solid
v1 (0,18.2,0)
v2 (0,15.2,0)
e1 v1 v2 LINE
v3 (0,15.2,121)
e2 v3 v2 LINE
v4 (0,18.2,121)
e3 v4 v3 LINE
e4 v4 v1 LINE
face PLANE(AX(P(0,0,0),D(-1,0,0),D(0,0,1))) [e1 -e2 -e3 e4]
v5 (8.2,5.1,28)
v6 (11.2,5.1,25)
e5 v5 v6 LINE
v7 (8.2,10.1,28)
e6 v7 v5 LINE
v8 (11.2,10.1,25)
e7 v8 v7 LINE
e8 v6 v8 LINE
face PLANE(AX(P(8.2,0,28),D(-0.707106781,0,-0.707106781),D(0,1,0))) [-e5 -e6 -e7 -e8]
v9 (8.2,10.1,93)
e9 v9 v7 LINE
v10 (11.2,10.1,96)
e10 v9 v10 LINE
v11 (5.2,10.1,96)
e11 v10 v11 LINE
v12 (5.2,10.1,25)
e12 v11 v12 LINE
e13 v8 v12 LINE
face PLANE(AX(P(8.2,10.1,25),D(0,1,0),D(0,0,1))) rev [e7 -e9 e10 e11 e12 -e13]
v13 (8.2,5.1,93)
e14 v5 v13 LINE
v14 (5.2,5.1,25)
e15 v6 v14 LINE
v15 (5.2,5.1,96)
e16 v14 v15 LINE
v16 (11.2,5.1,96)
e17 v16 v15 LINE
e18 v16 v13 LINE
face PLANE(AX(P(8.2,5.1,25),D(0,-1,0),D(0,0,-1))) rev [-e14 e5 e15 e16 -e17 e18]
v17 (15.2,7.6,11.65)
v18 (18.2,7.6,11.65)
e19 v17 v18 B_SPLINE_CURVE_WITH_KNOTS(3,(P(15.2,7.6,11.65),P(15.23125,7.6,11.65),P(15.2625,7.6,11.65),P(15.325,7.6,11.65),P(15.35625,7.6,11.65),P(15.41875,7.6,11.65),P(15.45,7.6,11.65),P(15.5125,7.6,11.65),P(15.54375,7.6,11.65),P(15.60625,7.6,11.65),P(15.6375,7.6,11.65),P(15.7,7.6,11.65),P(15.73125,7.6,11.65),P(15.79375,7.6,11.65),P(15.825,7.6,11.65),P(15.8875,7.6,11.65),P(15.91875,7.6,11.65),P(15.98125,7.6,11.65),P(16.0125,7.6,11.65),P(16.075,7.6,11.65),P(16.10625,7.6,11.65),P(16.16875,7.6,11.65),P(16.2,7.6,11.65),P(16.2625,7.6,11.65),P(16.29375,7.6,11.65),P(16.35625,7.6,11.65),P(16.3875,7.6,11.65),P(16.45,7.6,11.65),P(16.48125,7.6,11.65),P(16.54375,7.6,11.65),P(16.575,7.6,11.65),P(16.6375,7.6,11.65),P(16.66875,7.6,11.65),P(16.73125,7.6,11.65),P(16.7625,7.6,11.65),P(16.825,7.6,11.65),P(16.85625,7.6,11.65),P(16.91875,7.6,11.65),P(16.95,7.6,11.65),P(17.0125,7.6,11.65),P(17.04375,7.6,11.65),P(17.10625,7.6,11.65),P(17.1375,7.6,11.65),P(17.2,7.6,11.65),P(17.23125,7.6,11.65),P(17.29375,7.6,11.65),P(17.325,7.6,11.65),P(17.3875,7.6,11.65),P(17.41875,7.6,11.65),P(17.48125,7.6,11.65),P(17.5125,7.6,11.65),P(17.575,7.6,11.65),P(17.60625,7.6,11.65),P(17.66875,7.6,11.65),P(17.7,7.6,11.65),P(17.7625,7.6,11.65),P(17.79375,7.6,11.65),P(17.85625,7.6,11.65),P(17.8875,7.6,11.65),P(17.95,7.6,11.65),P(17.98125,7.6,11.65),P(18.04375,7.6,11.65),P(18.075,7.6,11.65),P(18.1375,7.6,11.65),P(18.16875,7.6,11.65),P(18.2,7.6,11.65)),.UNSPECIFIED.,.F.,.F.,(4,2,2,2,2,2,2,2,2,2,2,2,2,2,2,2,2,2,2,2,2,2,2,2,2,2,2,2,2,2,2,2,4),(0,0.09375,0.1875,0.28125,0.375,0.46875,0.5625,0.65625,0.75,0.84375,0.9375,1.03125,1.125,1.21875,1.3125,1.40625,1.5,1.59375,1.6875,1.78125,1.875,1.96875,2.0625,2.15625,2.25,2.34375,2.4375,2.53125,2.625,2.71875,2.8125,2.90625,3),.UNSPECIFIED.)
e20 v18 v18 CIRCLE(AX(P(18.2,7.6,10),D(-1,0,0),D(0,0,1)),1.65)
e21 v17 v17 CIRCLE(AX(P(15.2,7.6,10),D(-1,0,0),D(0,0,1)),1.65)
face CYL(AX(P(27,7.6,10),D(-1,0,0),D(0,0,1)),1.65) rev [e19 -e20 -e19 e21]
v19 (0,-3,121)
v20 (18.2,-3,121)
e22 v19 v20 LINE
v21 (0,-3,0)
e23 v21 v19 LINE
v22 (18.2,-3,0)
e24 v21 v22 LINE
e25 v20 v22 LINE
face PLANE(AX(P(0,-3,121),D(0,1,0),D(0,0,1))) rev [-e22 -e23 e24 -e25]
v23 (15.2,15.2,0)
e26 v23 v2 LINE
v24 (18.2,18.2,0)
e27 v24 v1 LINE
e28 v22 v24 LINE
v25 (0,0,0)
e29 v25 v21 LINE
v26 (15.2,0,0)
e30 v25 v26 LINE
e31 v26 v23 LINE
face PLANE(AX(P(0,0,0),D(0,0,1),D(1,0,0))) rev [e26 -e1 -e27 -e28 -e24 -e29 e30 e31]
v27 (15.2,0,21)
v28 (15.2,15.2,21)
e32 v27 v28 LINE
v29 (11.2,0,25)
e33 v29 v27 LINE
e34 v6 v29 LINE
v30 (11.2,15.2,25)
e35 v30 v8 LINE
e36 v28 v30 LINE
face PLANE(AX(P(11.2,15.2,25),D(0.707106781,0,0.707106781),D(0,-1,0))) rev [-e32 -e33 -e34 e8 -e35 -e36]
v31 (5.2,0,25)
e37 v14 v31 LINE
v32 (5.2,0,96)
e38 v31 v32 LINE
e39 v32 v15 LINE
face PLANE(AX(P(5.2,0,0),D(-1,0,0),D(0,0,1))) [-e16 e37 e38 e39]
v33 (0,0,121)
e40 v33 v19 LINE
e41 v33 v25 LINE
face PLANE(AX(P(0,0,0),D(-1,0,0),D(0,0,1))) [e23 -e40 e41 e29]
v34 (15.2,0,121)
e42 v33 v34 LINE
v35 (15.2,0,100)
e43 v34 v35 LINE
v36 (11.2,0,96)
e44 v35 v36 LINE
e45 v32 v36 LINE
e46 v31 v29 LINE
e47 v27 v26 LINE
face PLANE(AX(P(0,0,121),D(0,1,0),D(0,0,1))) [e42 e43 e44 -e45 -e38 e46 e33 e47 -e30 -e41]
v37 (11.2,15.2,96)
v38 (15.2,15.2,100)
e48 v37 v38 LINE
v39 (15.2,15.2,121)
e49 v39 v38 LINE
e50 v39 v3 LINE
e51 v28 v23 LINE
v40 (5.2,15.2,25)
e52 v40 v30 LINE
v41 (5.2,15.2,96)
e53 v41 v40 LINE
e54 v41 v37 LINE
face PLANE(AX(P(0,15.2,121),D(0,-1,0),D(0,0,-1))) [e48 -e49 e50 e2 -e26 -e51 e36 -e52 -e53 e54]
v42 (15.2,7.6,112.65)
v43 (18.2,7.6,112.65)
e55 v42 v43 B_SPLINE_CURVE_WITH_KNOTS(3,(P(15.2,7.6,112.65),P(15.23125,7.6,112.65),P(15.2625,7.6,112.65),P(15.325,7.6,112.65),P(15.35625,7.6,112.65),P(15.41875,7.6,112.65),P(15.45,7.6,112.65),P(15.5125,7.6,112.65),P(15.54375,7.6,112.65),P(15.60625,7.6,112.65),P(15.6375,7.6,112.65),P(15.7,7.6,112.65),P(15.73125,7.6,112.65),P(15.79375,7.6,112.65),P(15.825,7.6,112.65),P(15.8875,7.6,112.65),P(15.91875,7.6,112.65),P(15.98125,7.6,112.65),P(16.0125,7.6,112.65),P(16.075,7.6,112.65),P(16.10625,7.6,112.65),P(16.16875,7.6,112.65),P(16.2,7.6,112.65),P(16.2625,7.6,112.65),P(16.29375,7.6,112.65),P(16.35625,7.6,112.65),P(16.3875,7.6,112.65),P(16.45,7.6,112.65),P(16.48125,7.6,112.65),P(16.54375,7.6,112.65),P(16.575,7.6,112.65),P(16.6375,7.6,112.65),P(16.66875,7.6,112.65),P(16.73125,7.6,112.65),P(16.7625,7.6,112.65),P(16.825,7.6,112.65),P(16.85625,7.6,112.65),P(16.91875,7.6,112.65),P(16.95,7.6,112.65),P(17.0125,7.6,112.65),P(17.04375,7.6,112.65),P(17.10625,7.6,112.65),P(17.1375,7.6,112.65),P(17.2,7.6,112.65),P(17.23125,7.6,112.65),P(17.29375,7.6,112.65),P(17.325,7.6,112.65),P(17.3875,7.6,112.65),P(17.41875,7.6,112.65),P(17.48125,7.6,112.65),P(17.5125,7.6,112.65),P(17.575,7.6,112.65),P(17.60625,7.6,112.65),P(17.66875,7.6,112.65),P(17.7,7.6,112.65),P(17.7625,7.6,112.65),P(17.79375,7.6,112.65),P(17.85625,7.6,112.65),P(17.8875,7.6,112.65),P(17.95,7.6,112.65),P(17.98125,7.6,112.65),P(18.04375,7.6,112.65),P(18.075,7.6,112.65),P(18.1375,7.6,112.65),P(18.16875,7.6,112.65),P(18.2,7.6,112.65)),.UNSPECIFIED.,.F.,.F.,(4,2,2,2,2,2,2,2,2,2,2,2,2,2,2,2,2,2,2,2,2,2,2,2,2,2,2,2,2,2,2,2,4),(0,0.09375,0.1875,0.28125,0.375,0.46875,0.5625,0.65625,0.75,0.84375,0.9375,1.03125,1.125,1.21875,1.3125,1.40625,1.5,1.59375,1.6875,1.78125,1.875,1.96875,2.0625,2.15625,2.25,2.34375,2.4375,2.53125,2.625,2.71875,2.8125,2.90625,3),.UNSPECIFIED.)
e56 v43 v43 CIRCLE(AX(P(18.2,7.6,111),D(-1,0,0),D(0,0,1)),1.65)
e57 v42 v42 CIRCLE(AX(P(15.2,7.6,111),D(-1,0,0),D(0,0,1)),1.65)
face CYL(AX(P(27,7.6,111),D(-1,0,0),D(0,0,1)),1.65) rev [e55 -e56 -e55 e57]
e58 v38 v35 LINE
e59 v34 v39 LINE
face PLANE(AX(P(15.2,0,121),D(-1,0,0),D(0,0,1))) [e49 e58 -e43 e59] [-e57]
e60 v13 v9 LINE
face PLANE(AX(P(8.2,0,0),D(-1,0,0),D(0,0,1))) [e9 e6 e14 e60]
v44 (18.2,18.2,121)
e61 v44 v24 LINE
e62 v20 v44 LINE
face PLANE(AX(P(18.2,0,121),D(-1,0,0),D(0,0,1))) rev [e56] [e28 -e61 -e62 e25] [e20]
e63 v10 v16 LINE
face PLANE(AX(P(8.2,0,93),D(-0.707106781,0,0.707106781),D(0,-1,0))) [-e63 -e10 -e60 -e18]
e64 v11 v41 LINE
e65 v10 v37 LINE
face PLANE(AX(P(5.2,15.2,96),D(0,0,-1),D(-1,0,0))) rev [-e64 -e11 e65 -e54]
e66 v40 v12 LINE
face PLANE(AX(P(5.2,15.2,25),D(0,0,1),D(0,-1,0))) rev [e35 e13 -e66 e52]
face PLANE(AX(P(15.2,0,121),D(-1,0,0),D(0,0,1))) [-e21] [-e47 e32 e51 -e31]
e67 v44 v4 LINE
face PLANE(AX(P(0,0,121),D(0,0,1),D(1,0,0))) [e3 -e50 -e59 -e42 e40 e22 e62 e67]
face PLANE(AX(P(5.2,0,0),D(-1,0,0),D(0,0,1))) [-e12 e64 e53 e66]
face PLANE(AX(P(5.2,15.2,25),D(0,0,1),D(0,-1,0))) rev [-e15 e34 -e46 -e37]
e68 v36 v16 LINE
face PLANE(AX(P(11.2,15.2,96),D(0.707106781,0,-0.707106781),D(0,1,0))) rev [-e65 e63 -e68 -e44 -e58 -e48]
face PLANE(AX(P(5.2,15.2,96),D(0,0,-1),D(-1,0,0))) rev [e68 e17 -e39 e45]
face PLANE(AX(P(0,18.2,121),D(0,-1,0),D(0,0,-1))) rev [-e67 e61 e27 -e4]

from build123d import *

# Parameters (mm, degrees)
SKETCH_1_W          = 21.2
SKETCH_1_H          = 21.2
SKETCH_1_W_2        = 15.2
SKETCH_1_H_2        = 15.2
EXTRUDE_1_DEPTH     = 121
SKETCH_2_R          = 1.65
CUT_EXTRUDE_1_DEPTH = 30
SKETCH_3_W          = 314.053168424
SKETCH_3_H          = 46.219516436
CUT_EXTRUDE_2_DEPTH = 3
SKETCH_4_W          = 5
SKETCH_4_H          = 15.2
EXTRUDE_1_2_DEPTH   = 10
SKETCH_5_W          = 61
SKETCH_5_H          = 5
EXTRUDE_2_DEPTH     = 10
SKETCH_6_W          = 71
SKETCH_6_H          = 15.2
EXTRUDE_3_DEPTH     = 10
SKETCH_8_W          = 71
SKETCH_8_H          = 5
CUT_EXTRUDE_3_DEPTH = 3
CHAMFER_1_SIZE      = 3
CHAMFER_2_SIZE      = 4


with BuildPart() as part:
    # 草图1 → Extrude 1 (new body)
    with BuildSketch(Plane.XY):
        with Locations((7.6, 7.6)):
            Rectangle(SKETCH_1_W, SKETCH_1_H)
        with Locations((7.6, 7.6)):
            Rectangle(SKETCH_1_W_2, SKETCH_1_H_2, mode=Mode.SUBTRACT)
    extrude(amount=EXTRUDE_1_DEPTH)

    # 草图2 → 切除-拉伸1 (cut)
    with BuildSketch(Plane.ZY.offset(3)):
        with Locations((10, 7.6)):
            Circle(SKETCH_2_R)
        with Locations((111, 7.6)):
            Circle(SKETCH_2_R)
    extrude(amount=-CUT_EXTRUDE_1_DEPTH, mode=Mode.SUBTRACT)

    # 草图3 → 切除-拉伸2 (cut)
    with BuildSketch(Plane.ZY.offset(3)):
        with Locations((151.731232528, 0.202739406)):
            Rectangle(SKETCH_3_W, SKETCH_3_H)
    extrude(amount=-CUT_EXTRUDE_2_DEPTH, mode=Mode.SUBTRACT)

    # 草图4 → Extrude 1 2 (add)
    with BuildSketch(Plane.ZY.offset(-15.2)):
        with Locations((27.5, 7.6)):
            Rectangle(SKETCH_4_W, SKETCH_4_H)
        with Locations((93.5, 7.6)):
            Rectangle(SKETCH_4_W, SKETCH_4_H)
    extrude(amount=EXTRUDE_1_2_DEPTH)

    # 草图5 → 凸台-拉伸2 (add)
    with BuildSketch(Plane.ZY.offset(-15.2)):
        with Locations((60.5, 7.6)):
            Rectangle(SKETCH_5_W, SKETCH_5_H)
    extrude(amount=EXTRUDE_2_DEPTH)

    # 草图6 → 凸台-拉伸3 (add)
    with BuildSketch(Plane.ZY.offset(-15.2)):
        with Locations((60.5, 7.6)):
            Rectangle(SKETCH_6_W, SKETCH_6_H)
    extrude(amount=EXTRUDE_3_DEPTH)

    # 草图8 → 切除-拉伸3 (cut)
    with BuildSketch(Plane.ZY.offset(-5.2)):
        with Locations((60.5, 7.6)):
            Rectangle(SKETCH_8_W, SKETCH_8_H)
    extrude(amount=-CUT_EXTRUDE_3_DEPTH, mode=Mode.SUBTRACT)

    # 倒角1
    chamfer_1_edges = [part.edges().sort_by_distance(p)[0] for p in [
        (8.2, 7.6, 25),
        (8.2, 7.6, 96),
    ]]
    chamfer(chamfer_1_edges, length=CHAMFER_1_SIZE)

    # 倒角2
    chamfer_2_edges = [part.edges().sort_by_distance(p)[0] for p in [
        (15.2, 7.6, 25),
        (15.2, 7.6, 96),
    ]]
    chamfer(chamfer_2_edges, length=CHAMFER_2_SIZE - 0.0001)  # a hair under: the kernel refuses the full size


solid = part.part
